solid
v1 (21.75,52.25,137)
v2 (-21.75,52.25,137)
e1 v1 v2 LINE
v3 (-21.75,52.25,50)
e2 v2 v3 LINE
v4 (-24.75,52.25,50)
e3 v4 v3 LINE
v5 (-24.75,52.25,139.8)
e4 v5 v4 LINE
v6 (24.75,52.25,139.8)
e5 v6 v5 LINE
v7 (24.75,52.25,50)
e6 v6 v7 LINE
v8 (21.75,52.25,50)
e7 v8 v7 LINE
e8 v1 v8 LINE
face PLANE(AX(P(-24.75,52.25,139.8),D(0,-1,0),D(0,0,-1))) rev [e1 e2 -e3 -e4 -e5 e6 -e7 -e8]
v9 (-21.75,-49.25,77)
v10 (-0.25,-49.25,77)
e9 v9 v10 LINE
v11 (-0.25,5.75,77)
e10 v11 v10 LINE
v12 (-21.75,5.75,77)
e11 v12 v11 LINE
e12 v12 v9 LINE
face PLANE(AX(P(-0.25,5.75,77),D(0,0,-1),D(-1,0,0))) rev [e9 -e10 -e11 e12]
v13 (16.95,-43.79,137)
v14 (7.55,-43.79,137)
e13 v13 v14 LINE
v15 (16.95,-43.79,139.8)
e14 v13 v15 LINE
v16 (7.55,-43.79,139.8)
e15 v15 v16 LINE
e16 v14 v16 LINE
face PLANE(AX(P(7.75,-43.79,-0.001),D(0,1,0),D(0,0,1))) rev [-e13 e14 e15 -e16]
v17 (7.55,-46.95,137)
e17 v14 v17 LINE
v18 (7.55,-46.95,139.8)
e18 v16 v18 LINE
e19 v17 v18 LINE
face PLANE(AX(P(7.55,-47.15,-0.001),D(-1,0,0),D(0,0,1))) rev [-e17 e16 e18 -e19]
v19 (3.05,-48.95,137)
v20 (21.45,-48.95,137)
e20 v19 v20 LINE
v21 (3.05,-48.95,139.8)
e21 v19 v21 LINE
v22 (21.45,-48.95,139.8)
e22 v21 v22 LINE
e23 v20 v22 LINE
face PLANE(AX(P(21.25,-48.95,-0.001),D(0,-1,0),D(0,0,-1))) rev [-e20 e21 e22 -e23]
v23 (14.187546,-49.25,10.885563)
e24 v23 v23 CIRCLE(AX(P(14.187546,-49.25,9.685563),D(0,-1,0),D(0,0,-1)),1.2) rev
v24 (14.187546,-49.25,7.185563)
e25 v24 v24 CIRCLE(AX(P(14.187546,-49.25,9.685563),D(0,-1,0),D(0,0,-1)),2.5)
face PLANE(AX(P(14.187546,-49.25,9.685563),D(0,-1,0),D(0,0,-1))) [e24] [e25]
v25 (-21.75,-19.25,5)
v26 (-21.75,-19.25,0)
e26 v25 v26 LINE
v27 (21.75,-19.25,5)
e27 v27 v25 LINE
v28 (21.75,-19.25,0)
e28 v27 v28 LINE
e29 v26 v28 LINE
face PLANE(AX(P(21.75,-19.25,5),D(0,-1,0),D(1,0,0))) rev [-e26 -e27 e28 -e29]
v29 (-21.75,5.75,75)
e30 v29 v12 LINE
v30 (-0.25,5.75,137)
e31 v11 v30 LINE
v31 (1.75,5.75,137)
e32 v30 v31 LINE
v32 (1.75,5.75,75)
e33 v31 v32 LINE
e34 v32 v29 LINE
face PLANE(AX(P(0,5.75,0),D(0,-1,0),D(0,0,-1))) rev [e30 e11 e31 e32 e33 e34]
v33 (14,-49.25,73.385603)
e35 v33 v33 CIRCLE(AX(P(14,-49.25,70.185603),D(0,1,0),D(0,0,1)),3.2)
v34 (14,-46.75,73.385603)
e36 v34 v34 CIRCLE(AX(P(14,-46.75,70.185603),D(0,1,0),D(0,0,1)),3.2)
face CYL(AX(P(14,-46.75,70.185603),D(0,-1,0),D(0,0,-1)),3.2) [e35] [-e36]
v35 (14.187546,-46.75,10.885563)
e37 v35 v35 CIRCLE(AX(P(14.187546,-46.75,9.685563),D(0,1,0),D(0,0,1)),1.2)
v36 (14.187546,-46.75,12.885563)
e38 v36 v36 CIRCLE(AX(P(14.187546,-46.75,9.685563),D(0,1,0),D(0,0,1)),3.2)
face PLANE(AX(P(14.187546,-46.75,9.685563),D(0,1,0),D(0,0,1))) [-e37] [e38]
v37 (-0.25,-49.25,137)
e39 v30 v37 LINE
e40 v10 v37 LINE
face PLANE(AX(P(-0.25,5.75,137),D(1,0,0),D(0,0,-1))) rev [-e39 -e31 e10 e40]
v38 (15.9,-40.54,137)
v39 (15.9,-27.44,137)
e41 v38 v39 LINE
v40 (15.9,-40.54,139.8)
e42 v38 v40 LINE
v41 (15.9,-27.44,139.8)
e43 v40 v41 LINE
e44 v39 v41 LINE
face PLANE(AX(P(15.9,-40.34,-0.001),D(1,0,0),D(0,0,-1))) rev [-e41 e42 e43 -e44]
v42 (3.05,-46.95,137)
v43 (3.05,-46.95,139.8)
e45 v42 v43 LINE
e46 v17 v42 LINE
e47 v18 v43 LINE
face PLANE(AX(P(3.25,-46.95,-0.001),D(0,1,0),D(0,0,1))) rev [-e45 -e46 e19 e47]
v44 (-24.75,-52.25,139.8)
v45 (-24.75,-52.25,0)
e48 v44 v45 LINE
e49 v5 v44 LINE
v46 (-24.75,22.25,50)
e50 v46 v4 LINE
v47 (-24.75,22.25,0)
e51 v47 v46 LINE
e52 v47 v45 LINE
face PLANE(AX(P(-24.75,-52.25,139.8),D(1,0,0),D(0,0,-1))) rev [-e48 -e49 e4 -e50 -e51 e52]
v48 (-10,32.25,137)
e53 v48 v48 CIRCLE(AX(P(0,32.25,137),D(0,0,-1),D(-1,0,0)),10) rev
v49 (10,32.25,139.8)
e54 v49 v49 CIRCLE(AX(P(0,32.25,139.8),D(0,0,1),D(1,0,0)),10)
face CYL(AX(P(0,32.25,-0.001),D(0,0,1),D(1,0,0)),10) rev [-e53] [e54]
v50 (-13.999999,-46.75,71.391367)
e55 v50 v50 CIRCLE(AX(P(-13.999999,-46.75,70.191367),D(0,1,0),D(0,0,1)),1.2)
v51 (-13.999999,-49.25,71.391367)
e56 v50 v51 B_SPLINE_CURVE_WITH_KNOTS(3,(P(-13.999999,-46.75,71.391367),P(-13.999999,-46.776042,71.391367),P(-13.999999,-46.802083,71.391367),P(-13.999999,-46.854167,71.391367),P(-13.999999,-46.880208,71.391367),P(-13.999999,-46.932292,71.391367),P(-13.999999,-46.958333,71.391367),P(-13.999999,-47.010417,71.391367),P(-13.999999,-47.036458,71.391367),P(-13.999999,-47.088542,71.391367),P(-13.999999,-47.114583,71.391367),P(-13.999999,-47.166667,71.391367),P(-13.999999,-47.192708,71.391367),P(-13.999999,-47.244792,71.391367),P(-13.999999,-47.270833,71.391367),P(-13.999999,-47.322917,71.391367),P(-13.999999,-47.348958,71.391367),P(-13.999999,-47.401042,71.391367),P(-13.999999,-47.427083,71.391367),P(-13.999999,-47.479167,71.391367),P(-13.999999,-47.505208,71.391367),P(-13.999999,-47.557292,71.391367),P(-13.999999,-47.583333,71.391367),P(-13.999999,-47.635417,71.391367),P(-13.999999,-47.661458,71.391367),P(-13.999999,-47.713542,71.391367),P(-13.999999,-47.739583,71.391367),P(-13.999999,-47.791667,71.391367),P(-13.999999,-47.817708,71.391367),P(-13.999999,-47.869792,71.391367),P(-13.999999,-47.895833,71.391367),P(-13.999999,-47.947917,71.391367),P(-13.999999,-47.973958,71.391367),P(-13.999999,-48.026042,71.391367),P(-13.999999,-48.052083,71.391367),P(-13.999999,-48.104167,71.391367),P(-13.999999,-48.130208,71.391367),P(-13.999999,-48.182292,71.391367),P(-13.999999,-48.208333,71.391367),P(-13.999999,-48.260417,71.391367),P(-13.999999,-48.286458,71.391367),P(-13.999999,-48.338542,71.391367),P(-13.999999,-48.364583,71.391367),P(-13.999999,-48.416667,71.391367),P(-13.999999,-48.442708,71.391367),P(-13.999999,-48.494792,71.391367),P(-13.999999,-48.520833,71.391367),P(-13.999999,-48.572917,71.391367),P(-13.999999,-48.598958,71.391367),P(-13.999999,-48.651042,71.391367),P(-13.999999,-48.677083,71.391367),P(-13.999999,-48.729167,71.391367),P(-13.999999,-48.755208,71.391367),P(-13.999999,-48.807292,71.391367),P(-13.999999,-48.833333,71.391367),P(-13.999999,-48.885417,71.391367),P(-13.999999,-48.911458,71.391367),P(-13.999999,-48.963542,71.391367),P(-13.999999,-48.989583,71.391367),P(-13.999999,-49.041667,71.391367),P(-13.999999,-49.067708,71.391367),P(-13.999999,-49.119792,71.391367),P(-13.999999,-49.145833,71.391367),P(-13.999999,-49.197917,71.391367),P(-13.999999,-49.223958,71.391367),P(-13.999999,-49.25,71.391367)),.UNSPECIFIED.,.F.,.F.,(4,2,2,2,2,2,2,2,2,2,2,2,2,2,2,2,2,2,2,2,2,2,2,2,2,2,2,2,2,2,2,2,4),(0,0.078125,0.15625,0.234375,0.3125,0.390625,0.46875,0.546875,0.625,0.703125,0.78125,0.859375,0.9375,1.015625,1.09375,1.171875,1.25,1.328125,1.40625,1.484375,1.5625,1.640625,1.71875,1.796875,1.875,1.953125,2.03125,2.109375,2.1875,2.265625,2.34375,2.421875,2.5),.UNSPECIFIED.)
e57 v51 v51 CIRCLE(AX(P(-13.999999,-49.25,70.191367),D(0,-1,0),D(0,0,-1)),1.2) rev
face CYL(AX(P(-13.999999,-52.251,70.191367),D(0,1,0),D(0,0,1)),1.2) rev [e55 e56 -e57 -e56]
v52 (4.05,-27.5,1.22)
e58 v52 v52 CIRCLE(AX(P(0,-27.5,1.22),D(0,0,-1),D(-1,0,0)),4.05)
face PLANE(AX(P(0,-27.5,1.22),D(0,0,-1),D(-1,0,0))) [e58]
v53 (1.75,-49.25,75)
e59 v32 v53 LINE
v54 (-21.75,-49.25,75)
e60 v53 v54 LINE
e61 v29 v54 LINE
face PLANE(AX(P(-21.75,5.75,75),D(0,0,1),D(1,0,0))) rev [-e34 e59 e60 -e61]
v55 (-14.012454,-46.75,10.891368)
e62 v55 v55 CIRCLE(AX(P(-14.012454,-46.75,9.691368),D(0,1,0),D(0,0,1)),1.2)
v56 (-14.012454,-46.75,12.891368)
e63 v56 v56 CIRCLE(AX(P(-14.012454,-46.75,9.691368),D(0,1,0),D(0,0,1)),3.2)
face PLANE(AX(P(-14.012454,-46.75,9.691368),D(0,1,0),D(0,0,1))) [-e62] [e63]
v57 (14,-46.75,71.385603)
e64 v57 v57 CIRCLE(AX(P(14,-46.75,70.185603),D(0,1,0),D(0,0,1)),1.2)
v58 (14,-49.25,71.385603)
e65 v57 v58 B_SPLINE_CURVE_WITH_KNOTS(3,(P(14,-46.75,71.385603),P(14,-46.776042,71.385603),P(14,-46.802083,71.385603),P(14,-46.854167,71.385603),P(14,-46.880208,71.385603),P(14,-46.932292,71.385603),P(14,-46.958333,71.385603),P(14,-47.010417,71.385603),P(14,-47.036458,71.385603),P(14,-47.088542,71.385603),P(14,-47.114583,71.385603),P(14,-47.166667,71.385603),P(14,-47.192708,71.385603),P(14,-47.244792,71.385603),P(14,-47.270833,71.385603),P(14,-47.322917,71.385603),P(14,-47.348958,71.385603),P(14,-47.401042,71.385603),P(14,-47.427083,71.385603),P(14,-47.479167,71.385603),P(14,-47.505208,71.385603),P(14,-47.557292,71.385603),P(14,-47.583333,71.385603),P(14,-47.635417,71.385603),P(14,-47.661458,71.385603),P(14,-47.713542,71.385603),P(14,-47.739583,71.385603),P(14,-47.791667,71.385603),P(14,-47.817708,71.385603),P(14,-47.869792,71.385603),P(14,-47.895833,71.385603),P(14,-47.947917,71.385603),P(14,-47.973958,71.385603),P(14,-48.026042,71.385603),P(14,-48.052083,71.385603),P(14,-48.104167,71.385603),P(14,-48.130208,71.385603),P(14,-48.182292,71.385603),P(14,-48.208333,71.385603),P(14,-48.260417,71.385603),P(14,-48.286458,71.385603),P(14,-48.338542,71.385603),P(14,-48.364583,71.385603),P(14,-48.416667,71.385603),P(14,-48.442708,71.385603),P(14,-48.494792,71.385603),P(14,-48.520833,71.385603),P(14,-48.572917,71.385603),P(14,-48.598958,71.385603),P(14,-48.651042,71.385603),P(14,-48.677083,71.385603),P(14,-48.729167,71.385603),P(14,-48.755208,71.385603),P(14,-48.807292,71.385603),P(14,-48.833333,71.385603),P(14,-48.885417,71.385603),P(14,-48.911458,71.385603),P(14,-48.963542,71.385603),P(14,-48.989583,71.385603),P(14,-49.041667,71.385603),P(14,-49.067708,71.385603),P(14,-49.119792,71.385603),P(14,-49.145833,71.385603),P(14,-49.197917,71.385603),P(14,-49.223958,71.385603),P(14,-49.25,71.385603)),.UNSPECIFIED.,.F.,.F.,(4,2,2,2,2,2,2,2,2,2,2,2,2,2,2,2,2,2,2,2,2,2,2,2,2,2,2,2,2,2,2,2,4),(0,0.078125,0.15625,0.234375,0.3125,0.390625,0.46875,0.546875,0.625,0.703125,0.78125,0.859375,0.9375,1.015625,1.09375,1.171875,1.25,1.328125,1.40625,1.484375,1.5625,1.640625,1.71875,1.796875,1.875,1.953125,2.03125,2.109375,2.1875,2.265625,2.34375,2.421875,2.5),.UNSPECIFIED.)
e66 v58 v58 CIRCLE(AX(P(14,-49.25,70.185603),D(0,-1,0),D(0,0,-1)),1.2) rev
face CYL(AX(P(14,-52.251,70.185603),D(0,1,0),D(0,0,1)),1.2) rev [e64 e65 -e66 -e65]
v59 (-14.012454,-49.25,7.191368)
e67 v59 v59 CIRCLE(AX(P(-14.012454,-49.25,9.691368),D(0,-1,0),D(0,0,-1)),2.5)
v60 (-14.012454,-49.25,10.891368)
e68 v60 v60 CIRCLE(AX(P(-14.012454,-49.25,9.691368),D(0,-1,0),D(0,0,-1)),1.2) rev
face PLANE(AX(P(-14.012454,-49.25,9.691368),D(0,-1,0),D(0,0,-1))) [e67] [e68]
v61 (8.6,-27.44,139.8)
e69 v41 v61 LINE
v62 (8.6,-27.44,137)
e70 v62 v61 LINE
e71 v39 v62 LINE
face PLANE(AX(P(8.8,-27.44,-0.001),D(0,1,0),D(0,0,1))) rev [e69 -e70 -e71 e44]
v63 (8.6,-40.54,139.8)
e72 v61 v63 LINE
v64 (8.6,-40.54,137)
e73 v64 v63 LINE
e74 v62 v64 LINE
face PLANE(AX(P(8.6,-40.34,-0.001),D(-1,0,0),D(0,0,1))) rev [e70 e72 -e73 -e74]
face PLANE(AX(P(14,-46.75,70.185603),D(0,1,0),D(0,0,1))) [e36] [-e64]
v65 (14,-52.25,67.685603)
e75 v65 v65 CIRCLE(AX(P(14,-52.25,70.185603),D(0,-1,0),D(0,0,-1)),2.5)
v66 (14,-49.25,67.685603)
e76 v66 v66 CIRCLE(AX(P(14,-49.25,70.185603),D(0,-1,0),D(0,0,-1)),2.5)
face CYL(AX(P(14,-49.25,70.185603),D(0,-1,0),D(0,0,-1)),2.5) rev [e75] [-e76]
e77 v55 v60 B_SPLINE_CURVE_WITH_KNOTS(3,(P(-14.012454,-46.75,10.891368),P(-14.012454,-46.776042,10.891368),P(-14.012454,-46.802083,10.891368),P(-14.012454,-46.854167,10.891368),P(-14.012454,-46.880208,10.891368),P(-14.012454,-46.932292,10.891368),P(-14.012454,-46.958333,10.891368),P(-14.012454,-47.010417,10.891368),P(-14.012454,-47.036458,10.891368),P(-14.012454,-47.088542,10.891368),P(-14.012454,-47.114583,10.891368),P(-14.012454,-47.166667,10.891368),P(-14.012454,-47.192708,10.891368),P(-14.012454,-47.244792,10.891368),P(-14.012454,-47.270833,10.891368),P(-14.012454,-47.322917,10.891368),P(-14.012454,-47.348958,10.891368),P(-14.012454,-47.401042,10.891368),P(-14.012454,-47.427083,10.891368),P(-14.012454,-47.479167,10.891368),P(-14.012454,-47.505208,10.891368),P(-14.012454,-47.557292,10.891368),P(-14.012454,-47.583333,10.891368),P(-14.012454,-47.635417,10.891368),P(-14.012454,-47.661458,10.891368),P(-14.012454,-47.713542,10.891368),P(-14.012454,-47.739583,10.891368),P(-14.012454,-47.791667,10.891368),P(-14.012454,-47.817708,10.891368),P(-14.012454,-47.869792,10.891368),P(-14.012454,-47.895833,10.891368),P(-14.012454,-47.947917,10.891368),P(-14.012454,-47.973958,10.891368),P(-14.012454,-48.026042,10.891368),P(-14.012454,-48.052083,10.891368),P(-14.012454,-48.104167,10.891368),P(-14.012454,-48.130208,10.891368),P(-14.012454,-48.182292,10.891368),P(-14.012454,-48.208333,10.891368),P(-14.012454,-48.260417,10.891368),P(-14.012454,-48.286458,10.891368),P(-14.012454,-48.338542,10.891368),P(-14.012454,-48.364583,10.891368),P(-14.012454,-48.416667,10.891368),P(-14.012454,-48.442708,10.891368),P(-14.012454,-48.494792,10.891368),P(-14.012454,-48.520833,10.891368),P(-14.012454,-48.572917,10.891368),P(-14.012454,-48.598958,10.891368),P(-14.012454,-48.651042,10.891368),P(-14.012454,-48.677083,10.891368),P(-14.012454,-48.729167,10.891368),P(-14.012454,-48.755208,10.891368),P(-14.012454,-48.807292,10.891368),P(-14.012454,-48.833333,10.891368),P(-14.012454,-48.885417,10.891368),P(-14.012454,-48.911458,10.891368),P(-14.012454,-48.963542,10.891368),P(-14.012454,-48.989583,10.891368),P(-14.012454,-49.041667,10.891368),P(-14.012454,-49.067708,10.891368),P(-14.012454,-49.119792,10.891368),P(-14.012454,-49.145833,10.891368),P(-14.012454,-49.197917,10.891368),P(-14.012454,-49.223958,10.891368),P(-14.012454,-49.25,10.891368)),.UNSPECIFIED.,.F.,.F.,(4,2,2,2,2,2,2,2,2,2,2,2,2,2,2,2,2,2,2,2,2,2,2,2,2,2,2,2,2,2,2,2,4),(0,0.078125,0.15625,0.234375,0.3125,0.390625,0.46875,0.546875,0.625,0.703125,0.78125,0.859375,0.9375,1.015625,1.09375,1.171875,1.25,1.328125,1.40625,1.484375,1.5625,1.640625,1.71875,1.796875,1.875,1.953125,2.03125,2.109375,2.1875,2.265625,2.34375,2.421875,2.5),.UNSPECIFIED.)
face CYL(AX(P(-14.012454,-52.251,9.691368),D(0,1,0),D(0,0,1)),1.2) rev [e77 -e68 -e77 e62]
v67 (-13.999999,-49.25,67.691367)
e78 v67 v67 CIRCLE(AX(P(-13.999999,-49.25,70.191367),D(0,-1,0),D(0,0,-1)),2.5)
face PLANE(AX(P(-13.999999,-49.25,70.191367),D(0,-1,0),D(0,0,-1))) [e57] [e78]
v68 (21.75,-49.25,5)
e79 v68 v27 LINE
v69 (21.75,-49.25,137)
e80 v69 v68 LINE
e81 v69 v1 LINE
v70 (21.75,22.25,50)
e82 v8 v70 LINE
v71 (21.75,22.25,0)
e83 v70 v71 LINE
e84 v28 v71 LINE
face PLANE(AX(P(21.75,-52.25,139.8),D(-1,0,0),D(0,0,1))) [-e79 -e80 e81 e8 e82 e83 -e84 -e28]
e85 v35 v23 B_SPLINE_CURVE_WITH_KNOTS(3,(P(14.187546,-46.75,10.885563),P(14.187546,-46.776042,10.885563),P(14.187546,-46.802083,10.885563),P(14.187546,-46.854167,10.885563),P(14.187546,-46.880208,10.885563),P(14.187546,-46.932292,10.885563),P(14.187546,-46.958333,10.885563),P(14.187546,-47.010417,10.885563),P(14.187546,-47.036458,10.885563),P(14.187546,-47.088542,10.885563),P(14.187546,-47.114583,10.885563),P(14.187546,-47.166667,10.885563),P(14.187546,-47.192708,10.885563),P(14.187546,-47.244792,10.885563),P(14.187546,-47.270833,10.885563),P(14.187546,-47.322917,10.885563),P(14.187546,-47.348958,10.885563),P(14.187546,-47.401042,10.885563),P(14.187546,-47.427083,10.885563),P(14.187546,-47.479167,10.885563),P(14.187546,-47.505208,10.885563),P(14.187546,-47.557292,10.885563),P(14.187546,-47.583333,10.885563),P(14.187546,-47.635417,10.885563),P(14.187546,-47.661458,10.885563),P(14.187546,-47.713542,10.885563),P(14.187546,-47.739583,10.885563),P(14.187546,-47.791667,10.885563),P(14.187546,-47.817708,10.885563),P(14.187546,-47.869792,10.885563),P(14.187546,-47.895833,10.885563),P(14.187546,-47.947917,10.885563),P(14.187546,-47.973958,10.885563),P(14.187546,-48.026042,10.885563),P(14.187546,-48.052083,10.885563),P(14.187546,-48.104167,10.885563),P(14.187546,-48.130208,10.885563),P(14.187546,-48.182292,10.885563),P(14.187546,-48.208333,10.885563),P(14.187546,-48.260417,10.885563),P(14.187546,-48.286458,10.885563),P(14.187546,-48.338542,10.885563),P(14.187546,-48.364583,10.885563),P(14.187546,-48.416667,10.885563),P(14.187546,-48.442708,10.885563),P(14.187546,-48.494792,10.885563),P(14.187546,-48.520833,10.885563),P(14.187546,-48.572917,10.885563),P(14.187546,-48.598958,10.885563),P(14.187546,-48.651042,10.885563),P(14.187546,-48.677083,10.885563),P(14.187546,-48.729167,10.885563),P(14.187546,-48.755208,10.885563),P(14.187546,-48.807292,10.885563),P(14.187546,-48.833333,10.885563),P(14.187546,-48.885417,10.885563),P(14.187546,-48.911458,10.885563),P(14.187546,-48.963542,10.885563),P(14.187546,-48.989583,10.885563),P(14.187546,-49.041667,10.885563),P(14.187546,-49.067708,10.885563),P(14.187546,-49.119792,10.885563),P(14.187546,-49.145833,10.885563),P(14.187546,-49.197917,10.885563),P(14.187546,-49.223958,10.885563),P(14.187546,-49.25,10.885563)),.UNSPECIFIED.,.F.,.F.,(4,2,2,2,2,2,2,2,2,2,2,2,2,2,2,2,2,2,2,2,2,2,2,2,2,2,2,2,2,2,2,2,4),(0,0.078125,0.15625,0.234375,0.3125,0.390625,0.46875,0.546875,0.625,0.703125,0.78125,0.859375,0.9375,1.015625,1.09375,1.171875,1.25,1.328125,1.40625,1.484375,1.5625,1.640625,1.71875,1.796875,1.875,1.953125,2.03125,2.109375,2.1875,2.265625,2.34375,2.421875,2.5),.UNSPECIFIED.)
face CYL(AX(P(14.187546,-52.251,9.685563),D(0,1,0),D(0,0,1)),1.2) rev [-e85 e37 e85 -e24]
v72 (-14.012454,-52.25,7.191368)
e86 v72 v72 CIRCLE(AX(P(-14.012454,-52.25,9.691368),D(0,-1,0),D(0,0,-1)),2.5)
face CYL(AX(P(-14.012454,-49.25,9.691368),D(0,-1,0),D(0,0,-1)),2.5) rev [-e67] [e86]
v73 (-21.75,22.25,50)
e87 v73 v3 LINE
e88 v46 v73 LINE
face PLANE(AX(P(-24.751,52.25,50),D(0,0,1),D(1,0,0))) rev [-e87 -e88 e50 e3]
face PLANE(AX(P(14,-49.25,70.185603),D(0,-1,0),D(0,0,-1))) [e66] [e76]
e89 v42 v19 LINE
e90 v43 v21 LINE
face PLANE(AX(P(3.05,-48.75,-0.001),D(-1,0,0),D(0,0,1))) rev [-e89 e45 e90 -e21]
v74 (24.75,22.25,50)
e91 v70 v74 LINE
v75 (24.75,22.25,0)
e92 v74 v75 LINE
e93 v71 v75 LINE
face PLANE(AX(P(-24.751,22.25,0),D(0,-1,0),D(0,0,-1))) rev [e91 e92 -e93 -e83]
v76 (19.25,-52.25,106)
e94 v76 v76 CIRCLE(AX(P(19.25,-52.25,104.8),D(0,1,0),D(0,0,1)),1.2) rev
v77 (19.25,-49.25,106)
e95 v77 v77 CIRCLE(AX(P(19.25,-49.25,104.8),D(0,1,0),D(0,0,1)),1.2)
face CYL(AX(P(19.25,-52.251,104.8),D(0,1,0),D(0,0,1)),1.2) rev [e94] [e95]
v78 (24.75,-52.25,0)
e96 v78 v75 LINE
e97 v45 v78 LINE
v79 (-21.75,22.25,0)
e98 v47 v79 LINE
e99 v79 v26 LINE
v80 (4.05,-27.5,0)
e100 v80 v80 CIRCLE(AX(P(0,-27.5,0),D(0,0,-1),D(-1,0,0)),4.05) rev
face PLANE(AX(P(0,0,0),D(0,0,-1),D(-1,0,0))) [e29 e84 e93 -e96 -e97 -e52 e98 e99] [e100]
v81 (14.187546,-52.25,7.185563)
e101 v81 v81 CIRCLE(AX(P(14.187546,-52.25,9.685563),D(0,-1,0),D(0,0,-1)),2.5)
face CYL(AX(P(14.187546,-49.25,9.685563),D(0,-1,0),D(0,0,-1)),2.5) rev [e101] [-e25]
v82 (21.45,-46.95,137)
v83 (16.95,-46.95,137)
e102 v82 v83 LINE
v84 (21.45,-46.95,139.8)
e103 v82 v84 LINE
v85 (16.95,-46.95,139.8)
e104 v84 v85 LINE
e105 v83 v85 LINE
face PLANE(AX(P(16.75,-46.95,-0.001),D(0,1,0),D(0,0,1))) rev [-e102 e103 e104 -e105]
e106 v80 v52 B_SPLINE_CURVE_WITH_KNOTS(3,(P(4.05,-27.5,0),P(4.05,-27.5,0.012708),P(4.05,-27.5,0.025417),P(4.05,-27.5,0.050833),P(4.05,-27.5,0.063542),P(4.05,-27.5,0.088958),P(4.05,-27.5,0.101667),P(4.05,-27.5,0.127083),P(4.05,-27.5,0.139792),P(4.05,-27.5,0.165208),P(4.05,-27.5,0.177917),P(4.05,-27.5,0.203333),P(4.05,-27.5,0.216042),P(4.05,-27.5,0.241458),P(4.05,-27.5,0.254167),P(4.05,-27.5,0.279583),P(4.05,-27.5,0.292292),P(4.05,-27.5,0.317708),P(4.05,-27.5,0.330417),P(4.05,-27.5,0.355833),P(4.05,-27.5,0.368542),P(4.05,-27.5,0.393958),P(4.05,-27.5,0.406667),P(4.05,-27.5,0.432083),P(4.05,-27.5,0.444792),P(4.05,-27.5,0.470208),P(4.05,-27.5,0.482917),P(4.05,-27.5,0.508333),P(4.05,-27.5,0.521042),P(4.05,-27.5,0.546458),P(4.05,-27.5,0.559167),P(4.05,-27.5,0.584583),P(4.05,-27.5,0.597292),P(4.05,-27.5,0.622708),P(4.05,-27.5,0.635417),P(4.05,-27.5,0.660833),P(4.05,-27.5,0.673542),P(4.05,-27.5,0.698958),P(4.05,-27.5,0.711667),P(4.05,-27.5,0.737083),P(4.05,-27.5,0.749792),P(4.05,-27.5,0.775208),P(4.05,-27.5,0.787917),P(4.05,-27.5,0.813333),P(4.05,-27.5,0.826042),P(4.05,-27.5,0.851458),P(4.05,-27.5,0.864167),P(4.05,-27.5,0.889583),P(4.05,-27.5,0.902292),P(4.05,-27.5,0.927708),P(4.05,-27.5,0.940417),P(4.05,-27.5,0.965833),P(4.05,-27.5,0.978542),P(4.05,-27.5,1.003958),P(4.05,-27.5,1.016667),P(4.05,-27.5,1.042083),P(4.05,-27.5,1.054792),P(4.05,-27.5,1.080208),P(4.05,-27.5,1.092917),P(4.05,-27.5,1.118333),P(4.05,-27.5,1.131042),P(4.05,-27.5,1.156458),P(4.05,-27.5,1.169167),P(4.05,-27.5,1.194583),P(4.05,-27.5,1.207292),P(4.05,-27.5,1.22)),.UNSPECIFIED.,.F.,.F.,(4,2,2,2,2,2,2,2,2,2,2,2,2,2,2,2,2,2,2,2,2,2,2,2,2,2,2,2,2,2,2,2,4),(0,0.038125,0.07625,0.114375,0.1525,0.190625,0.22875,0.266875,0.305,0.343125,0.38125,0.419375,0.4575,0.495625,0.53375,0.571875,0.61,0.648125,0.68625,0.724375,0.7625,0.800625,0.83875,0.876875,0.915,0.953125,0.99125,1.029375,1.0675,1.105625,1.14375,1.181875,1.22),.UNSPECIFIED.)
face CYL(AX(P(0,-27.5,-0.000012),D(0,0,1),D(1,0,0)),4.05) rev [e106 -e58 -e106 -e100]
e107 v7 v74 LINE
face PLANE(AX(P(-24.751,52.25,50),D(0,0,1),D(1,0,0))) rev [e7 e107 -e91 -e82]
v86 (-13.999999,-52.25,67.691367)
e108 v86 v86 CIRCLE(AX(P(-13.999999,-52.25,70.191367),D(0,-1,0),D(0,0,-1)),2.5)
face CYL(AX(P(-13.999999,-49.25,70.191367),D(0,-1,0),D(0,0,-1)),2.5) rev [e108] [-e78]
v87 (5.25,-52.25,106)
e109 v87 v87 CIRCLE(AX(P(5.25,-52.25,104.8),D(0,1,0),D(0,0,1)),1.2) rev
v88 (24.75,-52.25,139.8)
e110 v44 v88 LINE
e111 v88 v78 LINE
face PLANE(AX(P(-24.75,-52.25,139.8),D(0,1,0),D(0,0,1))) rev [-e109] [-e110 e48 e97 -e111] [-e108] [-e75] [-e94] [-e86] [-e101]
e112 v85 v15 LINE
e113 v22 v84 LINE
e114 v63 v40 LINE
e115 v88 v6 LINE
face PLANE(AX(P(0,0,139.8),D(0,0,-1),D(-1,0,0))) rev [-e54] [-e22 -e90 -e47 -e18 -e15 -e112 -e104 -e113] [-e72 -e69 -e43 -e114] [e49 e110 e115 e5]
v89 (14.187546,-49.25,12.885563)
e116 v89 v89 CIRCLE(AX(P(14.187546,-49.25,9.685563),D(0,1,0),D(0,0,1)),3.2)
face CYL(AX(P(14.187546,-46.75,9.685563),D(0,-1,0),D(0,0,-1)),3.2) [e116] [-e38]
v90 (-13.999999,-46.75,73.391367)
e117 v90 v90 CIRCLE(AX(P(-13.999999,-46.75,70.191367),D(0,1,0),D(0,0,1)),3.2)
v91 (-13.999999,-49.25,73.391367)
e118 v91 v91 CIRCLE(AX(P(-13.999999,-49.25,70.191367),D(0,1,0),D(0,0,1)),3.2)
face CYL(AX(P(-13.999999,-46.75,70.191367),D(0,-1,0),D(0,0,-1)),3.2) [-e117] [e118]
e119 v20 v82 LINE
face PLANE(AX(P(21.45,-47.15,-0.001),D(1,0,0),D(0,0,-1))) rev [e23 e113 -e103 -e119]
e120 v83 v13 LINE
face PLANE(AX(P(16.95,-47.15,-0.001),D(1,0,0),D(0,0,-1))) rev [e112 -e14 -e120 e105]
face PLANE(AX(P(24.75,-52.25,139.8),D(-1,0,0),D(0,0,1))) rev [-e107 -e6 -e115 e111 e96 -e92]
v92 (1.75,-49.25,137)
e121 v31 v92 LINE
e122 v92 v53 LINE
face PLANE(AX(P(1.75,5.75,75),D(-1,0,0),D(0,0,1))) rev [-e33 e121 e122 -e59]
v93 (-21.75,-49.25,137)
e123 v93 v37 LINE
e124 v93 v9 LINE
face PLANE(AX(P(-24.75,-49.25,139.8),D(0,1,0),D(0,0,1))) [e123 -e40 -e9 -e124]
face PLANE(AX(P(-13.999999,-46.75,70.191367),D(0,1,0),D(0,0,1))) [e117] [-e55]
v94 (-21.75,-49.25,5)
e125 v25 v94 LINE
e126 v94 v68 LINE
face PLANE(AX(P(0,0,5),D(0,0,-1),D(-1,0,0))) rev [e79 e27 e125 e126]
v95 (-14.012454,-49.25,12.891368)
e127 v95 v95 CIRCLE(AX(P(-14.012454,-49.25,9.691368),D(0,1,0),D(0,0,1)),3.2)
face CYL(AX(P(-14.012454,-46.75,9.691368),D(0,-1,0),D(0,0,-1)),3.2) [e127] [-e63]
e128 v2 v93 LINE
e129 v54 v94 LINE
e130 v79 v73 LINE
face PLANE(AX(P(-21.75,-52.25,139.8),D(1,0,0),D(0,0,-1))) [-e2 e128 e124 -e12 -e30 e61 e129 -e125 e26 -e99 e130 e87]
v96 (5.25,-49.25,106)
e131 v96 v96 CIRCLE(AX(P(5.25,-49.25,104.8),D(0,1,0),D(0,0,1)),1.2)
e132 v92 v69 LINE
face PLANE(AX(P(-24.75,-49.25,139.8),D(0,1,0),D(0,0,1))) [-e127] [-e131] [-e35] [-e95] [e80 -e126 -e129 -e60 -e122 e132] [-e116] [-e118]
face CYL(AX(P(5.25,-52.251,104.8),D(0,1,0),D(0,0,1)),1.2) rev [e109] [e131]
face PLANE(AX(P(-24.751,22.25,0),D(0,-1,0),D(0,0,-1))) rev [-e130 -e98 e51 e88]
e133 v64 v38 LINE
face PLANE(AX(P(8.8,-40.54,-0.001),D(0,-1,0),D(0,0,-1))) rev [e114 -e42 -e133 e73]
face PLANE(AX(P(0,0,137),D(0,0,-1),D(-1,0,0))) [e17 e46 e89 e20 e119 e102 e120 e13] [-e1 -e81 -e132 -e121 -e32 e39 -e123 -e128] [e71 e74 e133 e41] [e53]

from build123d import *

# Parameters (mm, degrees)
ESQUISSE1_W                   = 49.5
ESQUISSE1_H                   = 104.5
BOSS_EXTRU_1_DEPTH            = 139.8
COQUE1_T                      = -3
ENL_V_MAT_EXTRU_1_REACH       = 159.24
ESQUISSE2_W                   = 50
ESQUISSE2_H                   = 30
ESQUISSE3_W                   = 43.5
ESQUISSE3_H                   = 30
BOSS_EXTRU_2_DEPTH            = 2
ENL_V_MAT_EXTRU_2_REACH       = 153.283
ESQUISSE5_R                   = 10
ENL_V_MAT_EXTRU_3_REACH       = 150.516
ESQUISSE6_W                   = 43.5
ESQUISSE6_H                   = 41.5
ENL_V_MAT_EXTRU_4_REACH       = 153.283
ESQUISSE7_W                   = 6.9
ESQUISSE7_H                   = 12.7
D_PLACER_START                = 136.8
D_PLACER_LA_FACE1_OUTLINE_W   = 43.5
D_PLACER_LA_FACE1_OUTLINE_H   = 101.5
D_PLACER_LA_FACE1_OUTLINE_W_2 = 6.9
D_PLACER_LA_FACE1_OUTLINE_H_2 = 12.7
D_PLACER_LA_FACE1_OUTLINE_R   = 10
D_PLACER_LA_FACE1_DEPTH       = 0.2
D_PLACER_START_2              = 137
D_PLACER_LA_FACE1_2_DEPTH     = 2.8
ENL_V_MAT_EXTRU_5_REACH       = 176.525
ESQUISSE8_R                   = 1.2
D_PLACER_START_3              = 8.6
D_PLACER_LA_FACE2_OUTLINE_W   = 13.1
D_PLACER_LA_FACE2_OUTLINE_H   = 2.8
D_PLACER_LA_FACE2_DEPTH       = 7.3
BOSS_EXTRU_3_DEPTH            = 55
ESQUISSE10_R                  = 3.2
BOSS_EXTRU_4_DEPTH            = 2.5
ENL_V_MAT_EXTRU_6_DEPTH       = 152.283393008
ENL_V_MAT_EXTRU_6_DEPTH_BACK  = 1.22
ESQUISSE12_R                  = 4.05
ENL_V_MAT_EXTRU_7_REACH       = 175.083
ESQUISSE13_R                  = 1.2
ESQUISSE14_R                  = 2.5
ENL_V_MAT_EXTRU_8_DEPTH       = 3


# Read off the part's stored shape, not the designer's step: Déplacer la face1, Déplacer la face2
with BuildPart() as part:
    # Esquisse1 → Boss.-Extru.1 (new body)
    with BuildSketch(Plane.XY):
        Rectangle(ESQUISSE1_W, ESQUISSE1_H)
    extrude(amount=BOSS_EXTRU_1_DEPTH)

    # Coque1
    coque1_openings = [part.faces().sort_by_distance(p)[0] for p in [
        (0, 52.25, 69.9),
    ]]
    offset(amount=COQUE1_T, openings=coque1_openings, kind=Kind.INTERSECTION)

    # Esquisse2 → Enlèv. mat.-Extru.1 (cut, up to next)
    with BuildSketch(Plane(origin=(24.75, 0, 0), x_dir=(0, 0, -1), z_dir=(1, 0, 0)), mode=Mode.PRIVATE) as enl_v_mat_extru_1_sk1:
        with Locations((-25, 37.25)):
            Rectangle(ESQUISSE2_W, ESQUISSE2_H)
    enl_v_mat_extru_1_tool1 = extrude(enl_v_mat_extru_1_sk1.sketch, amount=-ENL_V_MAT_EXTRU_1_REACH, mode=Mode.PRIVATE) & part.part
    add(enl_v_mat_extru_1_tool1.solids().sort_by_distance((24.75, 37.25, 25))[0], mode=Mode.SUBTRACT)

    # Esquisse3 → Boss.-Extru.2 (add)
    with BuildSketch(Plane.XY.offset(3)):
        with Locations((0, -34.25)):
            Rectangle(ESQUISSE3_W, ESQUISSE3_H)
    extrude(amount=BOSS_EXTRU_2_DEPTH)

    # Esquisse5 → Enlèv. mat.-Extru.2 (cut, up to next)
    with BuildSketch(Plane.XY.offset(139.8), mode=Mode.PRIVATE) as enl_v_mat_extru_2_sk1:
        with Locations((0, 32.25)):
            Circle(ESQUISSE5_R)
    enl_v_mat_extru_2_tool1 = extrude(enl_v_mat_extru_2_sk1.sketch, amount=-ENL_V_MAT_EXTRU_2_REACH, mode=Mode.PRIVATE) & part.part
    add(enl_v_mat_extru_2_tool1.solids().sort_by_distance((0, 32.25, 139.8))[0], mode=Mode.SUBTRACT)

    # Esquisse6 → Enlèv. mat.-Extru.3 (cut, up to next)
    with BuildSketch(Plane.XY.offset(3), mode=Mode.PRIVATE) as enl_v_mat_extru_3_sk1:
        with Locations((0, 1.5)):
            Rectangle(ESQUISSE6_W, ESQUISSE6_H)
    enl_v_mat_extru_3_tool1 = extrude(enl_v_mat_extru_3_sk1.sketch, amount=-ENL_V_MAT_EXTRU_3_REACH, mode=Mode.PRIVATE) & part.part
    add(enl_v_mat_extru_3_tool1.solids().sort_by_distance((0, 1.5, 3))[0], mode=Mode.SUBTRACT)

    # Esquisse7 → Enlèv. mat.-Extru.4 (cut, up to next)
    with BuildSketch(Plane.XY.offset(139.8), mode=Mode.PRIVATE) as enl_v_mat_extru_4_sk1:
        Polygon((16.75, -47.15), (21.25, -47.15), (21.25, -48.75), (3.25, -48.75), (3.25, -47.15), (7.75, -47.15), (7.75, -43.99), (16.75, -43.99), align=None)
    enl_v_mat_extru_4_tool1 = extrude(enl_v_mat_extru_4_sk1.sketch, amount=-ENL_V_MAT_EXTRU_4_REACH, mode=Mode.PRIVATE) & part.part
    # Esquisse7 → Enlèv. mat.-Extru.4 (cut, up to next)
    with BuildSketch(Plane.XY.offset(139.8), mode=Mode.PRIVATE) as enl_v_mat_extru_4_sk2:
        with Locations((12.25, -33.99)):
            Rectangle(ESQUISSE7_W, ESQUISSE7_H)
    enl_v_mat_extru_4_tool2 = extrude(enl_v_mat_extru_4_sk2.sketch, amount=-ENL_V_MAT_EXTRU_4_REACH, mode=Mode.PRIVATE) & part.part
    add(enl_v_mat_extru_4_tool1.solids().sort_by_distance((12.25, -46.767484, 139.8))[0], mode=Mode.SUBTRACT)
    add(enl_v_mat_extru_4_tool2.solids().sort_by_distance((12.25, -33.99, 139.8))[0], mode=Mode.SUBTRACT)

    # Déplacer la face1 outline → Déplacer la face1 (cut)
    with BuildSketch(Plane.XY.offset(D_PLACER_START)):
        with Locations((0, 1.5)):
            Rectangle(D_PLACER_LA_FACE1_OUTLINE_W, D_PLACER_LA_FACE1_OUTLINE_H)
        Polygon((16.75, -43.99), (16.75, -47.15), (21.25, -47.15), (21.25, -48.75), (3.25, -48.75), (3.25, -47.15), (7.75, -47.15), (7.75, -43.99), align=None, mode=Mode.SUBTRACT)
        with Locations((12.25, -33.99)):
            Rectangle(D_PLACER_LA_FACE1_OUTLINE_W_2, D_PLACER_LA_FACE1_OUTLINE_H_2, mode=Mode.SUBTRACT)
        with Locations((0, 32.25)):
            Circle(D_PLACER_LA_FACE1_OUTLINE_R, mode=Mode.SUBTRACT)
    extrude(amount=D_PLACER_LA_FACE1_DEPTH, mode=Mode.SUBTRACT)

    # D_placer la face1 2 outline → D_placer la face1 2 (cut)
    with BuildSketch(Plane.XY.offset(D_PLACER_START_2)):
        Polygon((21.45, -46.95), (16.95, -46.95), (16.95, -43.79), (7.55, -43.79), (7.55, -46.95), (3.05, -46.95), (3.05, -48.95), (21.45, -48.95), align=None)
        Polygon((16.75, -43.99), (16.75, -47.15), (21.25, -47.15), (21.25, -48.75), (3.25, -48.75), (3.25, -47.15), (7.75, -47.15), (7.75, -43.99), align=None, mode=Mode.SUBTRACT)
    extrude(amount=D_PLACER_LA_FACE1_2_DEPTH, mode=Mode.SUBTRACT)

    # Esquisse8 → Enlèv. mat.-Extru.5 (cut, up to next)
    with BuildSketch(Plane(origin=(0, -49.25, 0), x_dir=(1, 0, 0), z_dir=(0, 1, 0)), mode=Mode.PRIVATE) as enl_v_mat_extru_5_sk1:
        with Locations(Location((19.25, -104.8, 0), (0, 0, 270))):
            Circle(ESQUISSE8_R)
    enl_v_mat_extru_5_tool1 = extrude(enl_v_mat_extru_5_sk1.sketch, amount=-ENL_V_MAT_EXTRU_5_REACH, mode=Mode.PRIVATE) & part.part
    # Esquisse8 → Enlèv. mat.-Extru.5 (cut, up to next)
    with BuildSketch(Plane(origin=(0, -49.25, 0), x_dir=(1, 0, 0), z_dir=(0, 1, 0)), mode=Mode.PRIVATE) as enl_v_mat_extru_5_sk2:
        with Locations(Location((5.25, -104.8, 0), (0, 0, 270))):
            Circle(ESQUISSE8_R)
    enl_v_mat_extru_5_tool2 = extrude(enl_v_mat_extru_5_sk2.sketch, amount=-ENL_V_MAT_EXTRU_5_REACH, mode=Mode.PRIVATE) & part.part
    add(enl_v_mat_extru_5_tool1.solids().sort_by_distance((19.25, -49.25, 104.8))[0], mode=Mode.SUBTRACT)
    add(enl_v_mat_extru_5_tool2.solids().sort_by_distance((5.25, -49.25, 104.8))[0], mode=Mode.SUBTRACT)

    # Déplacer la face2 outline → Déplacer la face2 (cut)
    with BuildSketch(Plane.YZ.offset(D_PLACER_START_3)):
        with Locations((-33.99, 138.4)):
            Rectangle(D_PLACER_LA_FACE2_OUTLINE_W, D_PLACER_LA_FACE2_OUTLINE_H)
    extrude(amount=D_PLACER_LA_FACE2_DEPTH, mode=Mode.SUBTRACT)

    # Esquisse9 → Boss.-Extru.3 (add)
    with BuildSketch(Plane(origin=(0, -49.25, 0), x_dir=(1, 0, 0), z_dir=(0, 1, 0))):
        Polygon((-0.25, -137), (-0.25, -77), (-21.75, -77), (-21.75, -75), (1.75, -75), (1.75, -137), align=None)
    extrude(amount=BOSS_EXTRU_3_DEPTH)

    # Esquisse10 → Boss.-Extru.4 (add)
    with BuildSketch(Plane(origin=(0, -49.25, 0), x_dir=(1, 0, 0), z_dir=(0, 1, 0))):
        with Locations(Location((14.000000445, -70.185602769, 0), (0, 0, 270))):
            Circle(ESQUISSE10_R)
        with Locations(Location((-13.999998962, -70.191367017, 0), (0, 0, 270))):
            Circle(ESQUISSE10_R)
        with Locations(Location((14.187545547, -9.685562878, 0), (0, 0, 270))):
            Circle(ESQUISSE10_R)
        with Locations(Location((-14.012453855, -9.691368299, 0), (0, 0, 270))):
            Circle(ESQUISSE10_R)
    extrude(amount=BOSS_EXTRU_4_DEPTH)

    # Esquisse12 → Enlèv. mat.-Extru.6 (cut, two sides: drawn at the far end of the back side and taken through both)
    with BuildSketch(Plane(origin=(0, 0, 0), x_dir=(-1, 0, 0), z_dir=(0, 0, -1)).offset(-ENL_V_MAT_EXTRU_6_DEPTH_BACK)):
        with Locations(Location((0, -27.5, 0), (0, 0, 180))):
            Circle(ESQUISSE12_R)
    extrude(amount=ENL_V_MAT_EXTRU_6_DEPTH + ENL_V_MAT_EXTRU_6_DEPTH_BACK, mode=Mode.SUBTRACT)

    # Esquisse13 → Enlèv. mat.-Extru.7 (cut, up to next)
    with BuildSketch(Plane(origin=(0, -46.75, 0), x_dir=(1, 0, 0), z_dir=(0, 1, 0)), mode=Mode.PRIVATE) as enl_v_mat_extru_7_sk1:
        with Locations(Location((14.187545547, -9.685562878, 0), (0, 0, 270))):
            Circle(ESQUISSE13_R)
    enl_v_mat_extru_7_tool1 = extrude(enl_v_mat_extru_7_sk1.sketch, amount=-ENL_V_MAT_EXTRU_7_REACH, mode=Mode.PRIVATE) & part.part
    # Esquisse13 → Enlèv. mat.-Extru.7 (cut, up to next)
    with BuildSketch(Plane(origin=(0, -46.75, 0), x_dir=(1, 0, 0), z_dir=(0, 1, 0)), mode=Mode.PRIVATE) as enl_v_mat_extru_7_sk2:
        with Locations(Location((-14.012453855, -9.691368299, 0), (0, 0, 270))):
            Circle(ESQUISSE13_R)
    enl_v_mat_extru_7_tool2 = extrude(enl_v_mat_extru_7_sk2.sketch, amount=-ENL_V_MAT_EXTRU_7_REACH, mode=Mode.PRIVATE) & part.part
    # Esquisse13 → Enlèv. mat.-Extru.7 (cut, up to next)
    with BuildSketch(Plane(origin=(0, -46.75, 0), x_dir=(1, 0, 0), z_dir=(0, 1, 0)), mode=Mode.PRIVATE) as enl_v_mat_extru_7_sk3:
        with Locations(Location((-13.999998962, -70.191367017, 0), (0, 0, 270))):
            Circle(ESQUISSE13_R)
    enl_v_mat_extru_7_tool3 = extrude(enl_v_mat_extru_7_sk3.sketch, amount=-ENL_V_MAT_EXTRU_7_REACH, mode=Mode.PRIVATE) & part.part
    # Esquisse13 → Enlèv. mat.-Extru.7 (cut, up to next)
    with BuildSketch(Plane(origin=(0, -46.75, 0), x_dir=(1, 0, 0), z_dir=(0, 1, 0)), mode=Mode.PRIVATE) as enl_v_mat_extru_7_sk4:
        with Locations(Location((14.000000445, -70.185602769, 0), (0, 0, 270))):
            Circle(ESQUISSE13_R)
    enl_v_mat_extru_7_tool4 = extrude(enl_v_mat_extru_7_sk4.sketch, amount=-ENL_V_MAT_EXTRU_7_REACH, mode=Mode.PRIVATE) & part.part
    add(enl_v_mat_extru_7_tool1.solids().sort_by_distance((14.187546, -46.75, 9.685563))[0], mode=Mode.SUBTRACT)
    add(enl_v_mat_extru_7_tool2.solids().sort_by_distance((-14.012454, -46.75, 9.691368))[0], mode=Mode.SUBTRACT)
    add(enl_v_mat_extru_7_tool3.solids().sort_by_distance((-13.999999, -46.75, 70.191367))[0], mode=Mode.SUBTRACT)
    add(enl_v_mat_extru_7_tool4.solids().sort_by_distance((14, -46.75, 70.185603))[0], mode=Mode.SUBTRACT)

    # Esquisse14 → Enlèv. mat.-Extru.8 (cut)
    with BuildSketch(Plane.XZ.offset(52.25)):
        with Locations(Location((14.187545547, 9.685562878, 0), (0, 0, 270))):
            Circle(ESQUISSE14_R)
        with Locations(Location((-14.012453855, 9.691368299, 0), (0, 0, 270))):
            Circle(ESQUISSE14_R)
        with Locations(Location((-13.999998962, 70.191367017, 0), (0, 0, 270))):
            Circle(ESQUISSE14_R)
        with Locations(Location((14.000000445, 70.185602769, 0), (0, 0, 270))):
            Circle(ESQUISSE14_R)
    extrude(amount=-ENL_V_MAT_EXTRU_8_DEPTH, mode=Mode.SUBTRACT)


solid = part.part
